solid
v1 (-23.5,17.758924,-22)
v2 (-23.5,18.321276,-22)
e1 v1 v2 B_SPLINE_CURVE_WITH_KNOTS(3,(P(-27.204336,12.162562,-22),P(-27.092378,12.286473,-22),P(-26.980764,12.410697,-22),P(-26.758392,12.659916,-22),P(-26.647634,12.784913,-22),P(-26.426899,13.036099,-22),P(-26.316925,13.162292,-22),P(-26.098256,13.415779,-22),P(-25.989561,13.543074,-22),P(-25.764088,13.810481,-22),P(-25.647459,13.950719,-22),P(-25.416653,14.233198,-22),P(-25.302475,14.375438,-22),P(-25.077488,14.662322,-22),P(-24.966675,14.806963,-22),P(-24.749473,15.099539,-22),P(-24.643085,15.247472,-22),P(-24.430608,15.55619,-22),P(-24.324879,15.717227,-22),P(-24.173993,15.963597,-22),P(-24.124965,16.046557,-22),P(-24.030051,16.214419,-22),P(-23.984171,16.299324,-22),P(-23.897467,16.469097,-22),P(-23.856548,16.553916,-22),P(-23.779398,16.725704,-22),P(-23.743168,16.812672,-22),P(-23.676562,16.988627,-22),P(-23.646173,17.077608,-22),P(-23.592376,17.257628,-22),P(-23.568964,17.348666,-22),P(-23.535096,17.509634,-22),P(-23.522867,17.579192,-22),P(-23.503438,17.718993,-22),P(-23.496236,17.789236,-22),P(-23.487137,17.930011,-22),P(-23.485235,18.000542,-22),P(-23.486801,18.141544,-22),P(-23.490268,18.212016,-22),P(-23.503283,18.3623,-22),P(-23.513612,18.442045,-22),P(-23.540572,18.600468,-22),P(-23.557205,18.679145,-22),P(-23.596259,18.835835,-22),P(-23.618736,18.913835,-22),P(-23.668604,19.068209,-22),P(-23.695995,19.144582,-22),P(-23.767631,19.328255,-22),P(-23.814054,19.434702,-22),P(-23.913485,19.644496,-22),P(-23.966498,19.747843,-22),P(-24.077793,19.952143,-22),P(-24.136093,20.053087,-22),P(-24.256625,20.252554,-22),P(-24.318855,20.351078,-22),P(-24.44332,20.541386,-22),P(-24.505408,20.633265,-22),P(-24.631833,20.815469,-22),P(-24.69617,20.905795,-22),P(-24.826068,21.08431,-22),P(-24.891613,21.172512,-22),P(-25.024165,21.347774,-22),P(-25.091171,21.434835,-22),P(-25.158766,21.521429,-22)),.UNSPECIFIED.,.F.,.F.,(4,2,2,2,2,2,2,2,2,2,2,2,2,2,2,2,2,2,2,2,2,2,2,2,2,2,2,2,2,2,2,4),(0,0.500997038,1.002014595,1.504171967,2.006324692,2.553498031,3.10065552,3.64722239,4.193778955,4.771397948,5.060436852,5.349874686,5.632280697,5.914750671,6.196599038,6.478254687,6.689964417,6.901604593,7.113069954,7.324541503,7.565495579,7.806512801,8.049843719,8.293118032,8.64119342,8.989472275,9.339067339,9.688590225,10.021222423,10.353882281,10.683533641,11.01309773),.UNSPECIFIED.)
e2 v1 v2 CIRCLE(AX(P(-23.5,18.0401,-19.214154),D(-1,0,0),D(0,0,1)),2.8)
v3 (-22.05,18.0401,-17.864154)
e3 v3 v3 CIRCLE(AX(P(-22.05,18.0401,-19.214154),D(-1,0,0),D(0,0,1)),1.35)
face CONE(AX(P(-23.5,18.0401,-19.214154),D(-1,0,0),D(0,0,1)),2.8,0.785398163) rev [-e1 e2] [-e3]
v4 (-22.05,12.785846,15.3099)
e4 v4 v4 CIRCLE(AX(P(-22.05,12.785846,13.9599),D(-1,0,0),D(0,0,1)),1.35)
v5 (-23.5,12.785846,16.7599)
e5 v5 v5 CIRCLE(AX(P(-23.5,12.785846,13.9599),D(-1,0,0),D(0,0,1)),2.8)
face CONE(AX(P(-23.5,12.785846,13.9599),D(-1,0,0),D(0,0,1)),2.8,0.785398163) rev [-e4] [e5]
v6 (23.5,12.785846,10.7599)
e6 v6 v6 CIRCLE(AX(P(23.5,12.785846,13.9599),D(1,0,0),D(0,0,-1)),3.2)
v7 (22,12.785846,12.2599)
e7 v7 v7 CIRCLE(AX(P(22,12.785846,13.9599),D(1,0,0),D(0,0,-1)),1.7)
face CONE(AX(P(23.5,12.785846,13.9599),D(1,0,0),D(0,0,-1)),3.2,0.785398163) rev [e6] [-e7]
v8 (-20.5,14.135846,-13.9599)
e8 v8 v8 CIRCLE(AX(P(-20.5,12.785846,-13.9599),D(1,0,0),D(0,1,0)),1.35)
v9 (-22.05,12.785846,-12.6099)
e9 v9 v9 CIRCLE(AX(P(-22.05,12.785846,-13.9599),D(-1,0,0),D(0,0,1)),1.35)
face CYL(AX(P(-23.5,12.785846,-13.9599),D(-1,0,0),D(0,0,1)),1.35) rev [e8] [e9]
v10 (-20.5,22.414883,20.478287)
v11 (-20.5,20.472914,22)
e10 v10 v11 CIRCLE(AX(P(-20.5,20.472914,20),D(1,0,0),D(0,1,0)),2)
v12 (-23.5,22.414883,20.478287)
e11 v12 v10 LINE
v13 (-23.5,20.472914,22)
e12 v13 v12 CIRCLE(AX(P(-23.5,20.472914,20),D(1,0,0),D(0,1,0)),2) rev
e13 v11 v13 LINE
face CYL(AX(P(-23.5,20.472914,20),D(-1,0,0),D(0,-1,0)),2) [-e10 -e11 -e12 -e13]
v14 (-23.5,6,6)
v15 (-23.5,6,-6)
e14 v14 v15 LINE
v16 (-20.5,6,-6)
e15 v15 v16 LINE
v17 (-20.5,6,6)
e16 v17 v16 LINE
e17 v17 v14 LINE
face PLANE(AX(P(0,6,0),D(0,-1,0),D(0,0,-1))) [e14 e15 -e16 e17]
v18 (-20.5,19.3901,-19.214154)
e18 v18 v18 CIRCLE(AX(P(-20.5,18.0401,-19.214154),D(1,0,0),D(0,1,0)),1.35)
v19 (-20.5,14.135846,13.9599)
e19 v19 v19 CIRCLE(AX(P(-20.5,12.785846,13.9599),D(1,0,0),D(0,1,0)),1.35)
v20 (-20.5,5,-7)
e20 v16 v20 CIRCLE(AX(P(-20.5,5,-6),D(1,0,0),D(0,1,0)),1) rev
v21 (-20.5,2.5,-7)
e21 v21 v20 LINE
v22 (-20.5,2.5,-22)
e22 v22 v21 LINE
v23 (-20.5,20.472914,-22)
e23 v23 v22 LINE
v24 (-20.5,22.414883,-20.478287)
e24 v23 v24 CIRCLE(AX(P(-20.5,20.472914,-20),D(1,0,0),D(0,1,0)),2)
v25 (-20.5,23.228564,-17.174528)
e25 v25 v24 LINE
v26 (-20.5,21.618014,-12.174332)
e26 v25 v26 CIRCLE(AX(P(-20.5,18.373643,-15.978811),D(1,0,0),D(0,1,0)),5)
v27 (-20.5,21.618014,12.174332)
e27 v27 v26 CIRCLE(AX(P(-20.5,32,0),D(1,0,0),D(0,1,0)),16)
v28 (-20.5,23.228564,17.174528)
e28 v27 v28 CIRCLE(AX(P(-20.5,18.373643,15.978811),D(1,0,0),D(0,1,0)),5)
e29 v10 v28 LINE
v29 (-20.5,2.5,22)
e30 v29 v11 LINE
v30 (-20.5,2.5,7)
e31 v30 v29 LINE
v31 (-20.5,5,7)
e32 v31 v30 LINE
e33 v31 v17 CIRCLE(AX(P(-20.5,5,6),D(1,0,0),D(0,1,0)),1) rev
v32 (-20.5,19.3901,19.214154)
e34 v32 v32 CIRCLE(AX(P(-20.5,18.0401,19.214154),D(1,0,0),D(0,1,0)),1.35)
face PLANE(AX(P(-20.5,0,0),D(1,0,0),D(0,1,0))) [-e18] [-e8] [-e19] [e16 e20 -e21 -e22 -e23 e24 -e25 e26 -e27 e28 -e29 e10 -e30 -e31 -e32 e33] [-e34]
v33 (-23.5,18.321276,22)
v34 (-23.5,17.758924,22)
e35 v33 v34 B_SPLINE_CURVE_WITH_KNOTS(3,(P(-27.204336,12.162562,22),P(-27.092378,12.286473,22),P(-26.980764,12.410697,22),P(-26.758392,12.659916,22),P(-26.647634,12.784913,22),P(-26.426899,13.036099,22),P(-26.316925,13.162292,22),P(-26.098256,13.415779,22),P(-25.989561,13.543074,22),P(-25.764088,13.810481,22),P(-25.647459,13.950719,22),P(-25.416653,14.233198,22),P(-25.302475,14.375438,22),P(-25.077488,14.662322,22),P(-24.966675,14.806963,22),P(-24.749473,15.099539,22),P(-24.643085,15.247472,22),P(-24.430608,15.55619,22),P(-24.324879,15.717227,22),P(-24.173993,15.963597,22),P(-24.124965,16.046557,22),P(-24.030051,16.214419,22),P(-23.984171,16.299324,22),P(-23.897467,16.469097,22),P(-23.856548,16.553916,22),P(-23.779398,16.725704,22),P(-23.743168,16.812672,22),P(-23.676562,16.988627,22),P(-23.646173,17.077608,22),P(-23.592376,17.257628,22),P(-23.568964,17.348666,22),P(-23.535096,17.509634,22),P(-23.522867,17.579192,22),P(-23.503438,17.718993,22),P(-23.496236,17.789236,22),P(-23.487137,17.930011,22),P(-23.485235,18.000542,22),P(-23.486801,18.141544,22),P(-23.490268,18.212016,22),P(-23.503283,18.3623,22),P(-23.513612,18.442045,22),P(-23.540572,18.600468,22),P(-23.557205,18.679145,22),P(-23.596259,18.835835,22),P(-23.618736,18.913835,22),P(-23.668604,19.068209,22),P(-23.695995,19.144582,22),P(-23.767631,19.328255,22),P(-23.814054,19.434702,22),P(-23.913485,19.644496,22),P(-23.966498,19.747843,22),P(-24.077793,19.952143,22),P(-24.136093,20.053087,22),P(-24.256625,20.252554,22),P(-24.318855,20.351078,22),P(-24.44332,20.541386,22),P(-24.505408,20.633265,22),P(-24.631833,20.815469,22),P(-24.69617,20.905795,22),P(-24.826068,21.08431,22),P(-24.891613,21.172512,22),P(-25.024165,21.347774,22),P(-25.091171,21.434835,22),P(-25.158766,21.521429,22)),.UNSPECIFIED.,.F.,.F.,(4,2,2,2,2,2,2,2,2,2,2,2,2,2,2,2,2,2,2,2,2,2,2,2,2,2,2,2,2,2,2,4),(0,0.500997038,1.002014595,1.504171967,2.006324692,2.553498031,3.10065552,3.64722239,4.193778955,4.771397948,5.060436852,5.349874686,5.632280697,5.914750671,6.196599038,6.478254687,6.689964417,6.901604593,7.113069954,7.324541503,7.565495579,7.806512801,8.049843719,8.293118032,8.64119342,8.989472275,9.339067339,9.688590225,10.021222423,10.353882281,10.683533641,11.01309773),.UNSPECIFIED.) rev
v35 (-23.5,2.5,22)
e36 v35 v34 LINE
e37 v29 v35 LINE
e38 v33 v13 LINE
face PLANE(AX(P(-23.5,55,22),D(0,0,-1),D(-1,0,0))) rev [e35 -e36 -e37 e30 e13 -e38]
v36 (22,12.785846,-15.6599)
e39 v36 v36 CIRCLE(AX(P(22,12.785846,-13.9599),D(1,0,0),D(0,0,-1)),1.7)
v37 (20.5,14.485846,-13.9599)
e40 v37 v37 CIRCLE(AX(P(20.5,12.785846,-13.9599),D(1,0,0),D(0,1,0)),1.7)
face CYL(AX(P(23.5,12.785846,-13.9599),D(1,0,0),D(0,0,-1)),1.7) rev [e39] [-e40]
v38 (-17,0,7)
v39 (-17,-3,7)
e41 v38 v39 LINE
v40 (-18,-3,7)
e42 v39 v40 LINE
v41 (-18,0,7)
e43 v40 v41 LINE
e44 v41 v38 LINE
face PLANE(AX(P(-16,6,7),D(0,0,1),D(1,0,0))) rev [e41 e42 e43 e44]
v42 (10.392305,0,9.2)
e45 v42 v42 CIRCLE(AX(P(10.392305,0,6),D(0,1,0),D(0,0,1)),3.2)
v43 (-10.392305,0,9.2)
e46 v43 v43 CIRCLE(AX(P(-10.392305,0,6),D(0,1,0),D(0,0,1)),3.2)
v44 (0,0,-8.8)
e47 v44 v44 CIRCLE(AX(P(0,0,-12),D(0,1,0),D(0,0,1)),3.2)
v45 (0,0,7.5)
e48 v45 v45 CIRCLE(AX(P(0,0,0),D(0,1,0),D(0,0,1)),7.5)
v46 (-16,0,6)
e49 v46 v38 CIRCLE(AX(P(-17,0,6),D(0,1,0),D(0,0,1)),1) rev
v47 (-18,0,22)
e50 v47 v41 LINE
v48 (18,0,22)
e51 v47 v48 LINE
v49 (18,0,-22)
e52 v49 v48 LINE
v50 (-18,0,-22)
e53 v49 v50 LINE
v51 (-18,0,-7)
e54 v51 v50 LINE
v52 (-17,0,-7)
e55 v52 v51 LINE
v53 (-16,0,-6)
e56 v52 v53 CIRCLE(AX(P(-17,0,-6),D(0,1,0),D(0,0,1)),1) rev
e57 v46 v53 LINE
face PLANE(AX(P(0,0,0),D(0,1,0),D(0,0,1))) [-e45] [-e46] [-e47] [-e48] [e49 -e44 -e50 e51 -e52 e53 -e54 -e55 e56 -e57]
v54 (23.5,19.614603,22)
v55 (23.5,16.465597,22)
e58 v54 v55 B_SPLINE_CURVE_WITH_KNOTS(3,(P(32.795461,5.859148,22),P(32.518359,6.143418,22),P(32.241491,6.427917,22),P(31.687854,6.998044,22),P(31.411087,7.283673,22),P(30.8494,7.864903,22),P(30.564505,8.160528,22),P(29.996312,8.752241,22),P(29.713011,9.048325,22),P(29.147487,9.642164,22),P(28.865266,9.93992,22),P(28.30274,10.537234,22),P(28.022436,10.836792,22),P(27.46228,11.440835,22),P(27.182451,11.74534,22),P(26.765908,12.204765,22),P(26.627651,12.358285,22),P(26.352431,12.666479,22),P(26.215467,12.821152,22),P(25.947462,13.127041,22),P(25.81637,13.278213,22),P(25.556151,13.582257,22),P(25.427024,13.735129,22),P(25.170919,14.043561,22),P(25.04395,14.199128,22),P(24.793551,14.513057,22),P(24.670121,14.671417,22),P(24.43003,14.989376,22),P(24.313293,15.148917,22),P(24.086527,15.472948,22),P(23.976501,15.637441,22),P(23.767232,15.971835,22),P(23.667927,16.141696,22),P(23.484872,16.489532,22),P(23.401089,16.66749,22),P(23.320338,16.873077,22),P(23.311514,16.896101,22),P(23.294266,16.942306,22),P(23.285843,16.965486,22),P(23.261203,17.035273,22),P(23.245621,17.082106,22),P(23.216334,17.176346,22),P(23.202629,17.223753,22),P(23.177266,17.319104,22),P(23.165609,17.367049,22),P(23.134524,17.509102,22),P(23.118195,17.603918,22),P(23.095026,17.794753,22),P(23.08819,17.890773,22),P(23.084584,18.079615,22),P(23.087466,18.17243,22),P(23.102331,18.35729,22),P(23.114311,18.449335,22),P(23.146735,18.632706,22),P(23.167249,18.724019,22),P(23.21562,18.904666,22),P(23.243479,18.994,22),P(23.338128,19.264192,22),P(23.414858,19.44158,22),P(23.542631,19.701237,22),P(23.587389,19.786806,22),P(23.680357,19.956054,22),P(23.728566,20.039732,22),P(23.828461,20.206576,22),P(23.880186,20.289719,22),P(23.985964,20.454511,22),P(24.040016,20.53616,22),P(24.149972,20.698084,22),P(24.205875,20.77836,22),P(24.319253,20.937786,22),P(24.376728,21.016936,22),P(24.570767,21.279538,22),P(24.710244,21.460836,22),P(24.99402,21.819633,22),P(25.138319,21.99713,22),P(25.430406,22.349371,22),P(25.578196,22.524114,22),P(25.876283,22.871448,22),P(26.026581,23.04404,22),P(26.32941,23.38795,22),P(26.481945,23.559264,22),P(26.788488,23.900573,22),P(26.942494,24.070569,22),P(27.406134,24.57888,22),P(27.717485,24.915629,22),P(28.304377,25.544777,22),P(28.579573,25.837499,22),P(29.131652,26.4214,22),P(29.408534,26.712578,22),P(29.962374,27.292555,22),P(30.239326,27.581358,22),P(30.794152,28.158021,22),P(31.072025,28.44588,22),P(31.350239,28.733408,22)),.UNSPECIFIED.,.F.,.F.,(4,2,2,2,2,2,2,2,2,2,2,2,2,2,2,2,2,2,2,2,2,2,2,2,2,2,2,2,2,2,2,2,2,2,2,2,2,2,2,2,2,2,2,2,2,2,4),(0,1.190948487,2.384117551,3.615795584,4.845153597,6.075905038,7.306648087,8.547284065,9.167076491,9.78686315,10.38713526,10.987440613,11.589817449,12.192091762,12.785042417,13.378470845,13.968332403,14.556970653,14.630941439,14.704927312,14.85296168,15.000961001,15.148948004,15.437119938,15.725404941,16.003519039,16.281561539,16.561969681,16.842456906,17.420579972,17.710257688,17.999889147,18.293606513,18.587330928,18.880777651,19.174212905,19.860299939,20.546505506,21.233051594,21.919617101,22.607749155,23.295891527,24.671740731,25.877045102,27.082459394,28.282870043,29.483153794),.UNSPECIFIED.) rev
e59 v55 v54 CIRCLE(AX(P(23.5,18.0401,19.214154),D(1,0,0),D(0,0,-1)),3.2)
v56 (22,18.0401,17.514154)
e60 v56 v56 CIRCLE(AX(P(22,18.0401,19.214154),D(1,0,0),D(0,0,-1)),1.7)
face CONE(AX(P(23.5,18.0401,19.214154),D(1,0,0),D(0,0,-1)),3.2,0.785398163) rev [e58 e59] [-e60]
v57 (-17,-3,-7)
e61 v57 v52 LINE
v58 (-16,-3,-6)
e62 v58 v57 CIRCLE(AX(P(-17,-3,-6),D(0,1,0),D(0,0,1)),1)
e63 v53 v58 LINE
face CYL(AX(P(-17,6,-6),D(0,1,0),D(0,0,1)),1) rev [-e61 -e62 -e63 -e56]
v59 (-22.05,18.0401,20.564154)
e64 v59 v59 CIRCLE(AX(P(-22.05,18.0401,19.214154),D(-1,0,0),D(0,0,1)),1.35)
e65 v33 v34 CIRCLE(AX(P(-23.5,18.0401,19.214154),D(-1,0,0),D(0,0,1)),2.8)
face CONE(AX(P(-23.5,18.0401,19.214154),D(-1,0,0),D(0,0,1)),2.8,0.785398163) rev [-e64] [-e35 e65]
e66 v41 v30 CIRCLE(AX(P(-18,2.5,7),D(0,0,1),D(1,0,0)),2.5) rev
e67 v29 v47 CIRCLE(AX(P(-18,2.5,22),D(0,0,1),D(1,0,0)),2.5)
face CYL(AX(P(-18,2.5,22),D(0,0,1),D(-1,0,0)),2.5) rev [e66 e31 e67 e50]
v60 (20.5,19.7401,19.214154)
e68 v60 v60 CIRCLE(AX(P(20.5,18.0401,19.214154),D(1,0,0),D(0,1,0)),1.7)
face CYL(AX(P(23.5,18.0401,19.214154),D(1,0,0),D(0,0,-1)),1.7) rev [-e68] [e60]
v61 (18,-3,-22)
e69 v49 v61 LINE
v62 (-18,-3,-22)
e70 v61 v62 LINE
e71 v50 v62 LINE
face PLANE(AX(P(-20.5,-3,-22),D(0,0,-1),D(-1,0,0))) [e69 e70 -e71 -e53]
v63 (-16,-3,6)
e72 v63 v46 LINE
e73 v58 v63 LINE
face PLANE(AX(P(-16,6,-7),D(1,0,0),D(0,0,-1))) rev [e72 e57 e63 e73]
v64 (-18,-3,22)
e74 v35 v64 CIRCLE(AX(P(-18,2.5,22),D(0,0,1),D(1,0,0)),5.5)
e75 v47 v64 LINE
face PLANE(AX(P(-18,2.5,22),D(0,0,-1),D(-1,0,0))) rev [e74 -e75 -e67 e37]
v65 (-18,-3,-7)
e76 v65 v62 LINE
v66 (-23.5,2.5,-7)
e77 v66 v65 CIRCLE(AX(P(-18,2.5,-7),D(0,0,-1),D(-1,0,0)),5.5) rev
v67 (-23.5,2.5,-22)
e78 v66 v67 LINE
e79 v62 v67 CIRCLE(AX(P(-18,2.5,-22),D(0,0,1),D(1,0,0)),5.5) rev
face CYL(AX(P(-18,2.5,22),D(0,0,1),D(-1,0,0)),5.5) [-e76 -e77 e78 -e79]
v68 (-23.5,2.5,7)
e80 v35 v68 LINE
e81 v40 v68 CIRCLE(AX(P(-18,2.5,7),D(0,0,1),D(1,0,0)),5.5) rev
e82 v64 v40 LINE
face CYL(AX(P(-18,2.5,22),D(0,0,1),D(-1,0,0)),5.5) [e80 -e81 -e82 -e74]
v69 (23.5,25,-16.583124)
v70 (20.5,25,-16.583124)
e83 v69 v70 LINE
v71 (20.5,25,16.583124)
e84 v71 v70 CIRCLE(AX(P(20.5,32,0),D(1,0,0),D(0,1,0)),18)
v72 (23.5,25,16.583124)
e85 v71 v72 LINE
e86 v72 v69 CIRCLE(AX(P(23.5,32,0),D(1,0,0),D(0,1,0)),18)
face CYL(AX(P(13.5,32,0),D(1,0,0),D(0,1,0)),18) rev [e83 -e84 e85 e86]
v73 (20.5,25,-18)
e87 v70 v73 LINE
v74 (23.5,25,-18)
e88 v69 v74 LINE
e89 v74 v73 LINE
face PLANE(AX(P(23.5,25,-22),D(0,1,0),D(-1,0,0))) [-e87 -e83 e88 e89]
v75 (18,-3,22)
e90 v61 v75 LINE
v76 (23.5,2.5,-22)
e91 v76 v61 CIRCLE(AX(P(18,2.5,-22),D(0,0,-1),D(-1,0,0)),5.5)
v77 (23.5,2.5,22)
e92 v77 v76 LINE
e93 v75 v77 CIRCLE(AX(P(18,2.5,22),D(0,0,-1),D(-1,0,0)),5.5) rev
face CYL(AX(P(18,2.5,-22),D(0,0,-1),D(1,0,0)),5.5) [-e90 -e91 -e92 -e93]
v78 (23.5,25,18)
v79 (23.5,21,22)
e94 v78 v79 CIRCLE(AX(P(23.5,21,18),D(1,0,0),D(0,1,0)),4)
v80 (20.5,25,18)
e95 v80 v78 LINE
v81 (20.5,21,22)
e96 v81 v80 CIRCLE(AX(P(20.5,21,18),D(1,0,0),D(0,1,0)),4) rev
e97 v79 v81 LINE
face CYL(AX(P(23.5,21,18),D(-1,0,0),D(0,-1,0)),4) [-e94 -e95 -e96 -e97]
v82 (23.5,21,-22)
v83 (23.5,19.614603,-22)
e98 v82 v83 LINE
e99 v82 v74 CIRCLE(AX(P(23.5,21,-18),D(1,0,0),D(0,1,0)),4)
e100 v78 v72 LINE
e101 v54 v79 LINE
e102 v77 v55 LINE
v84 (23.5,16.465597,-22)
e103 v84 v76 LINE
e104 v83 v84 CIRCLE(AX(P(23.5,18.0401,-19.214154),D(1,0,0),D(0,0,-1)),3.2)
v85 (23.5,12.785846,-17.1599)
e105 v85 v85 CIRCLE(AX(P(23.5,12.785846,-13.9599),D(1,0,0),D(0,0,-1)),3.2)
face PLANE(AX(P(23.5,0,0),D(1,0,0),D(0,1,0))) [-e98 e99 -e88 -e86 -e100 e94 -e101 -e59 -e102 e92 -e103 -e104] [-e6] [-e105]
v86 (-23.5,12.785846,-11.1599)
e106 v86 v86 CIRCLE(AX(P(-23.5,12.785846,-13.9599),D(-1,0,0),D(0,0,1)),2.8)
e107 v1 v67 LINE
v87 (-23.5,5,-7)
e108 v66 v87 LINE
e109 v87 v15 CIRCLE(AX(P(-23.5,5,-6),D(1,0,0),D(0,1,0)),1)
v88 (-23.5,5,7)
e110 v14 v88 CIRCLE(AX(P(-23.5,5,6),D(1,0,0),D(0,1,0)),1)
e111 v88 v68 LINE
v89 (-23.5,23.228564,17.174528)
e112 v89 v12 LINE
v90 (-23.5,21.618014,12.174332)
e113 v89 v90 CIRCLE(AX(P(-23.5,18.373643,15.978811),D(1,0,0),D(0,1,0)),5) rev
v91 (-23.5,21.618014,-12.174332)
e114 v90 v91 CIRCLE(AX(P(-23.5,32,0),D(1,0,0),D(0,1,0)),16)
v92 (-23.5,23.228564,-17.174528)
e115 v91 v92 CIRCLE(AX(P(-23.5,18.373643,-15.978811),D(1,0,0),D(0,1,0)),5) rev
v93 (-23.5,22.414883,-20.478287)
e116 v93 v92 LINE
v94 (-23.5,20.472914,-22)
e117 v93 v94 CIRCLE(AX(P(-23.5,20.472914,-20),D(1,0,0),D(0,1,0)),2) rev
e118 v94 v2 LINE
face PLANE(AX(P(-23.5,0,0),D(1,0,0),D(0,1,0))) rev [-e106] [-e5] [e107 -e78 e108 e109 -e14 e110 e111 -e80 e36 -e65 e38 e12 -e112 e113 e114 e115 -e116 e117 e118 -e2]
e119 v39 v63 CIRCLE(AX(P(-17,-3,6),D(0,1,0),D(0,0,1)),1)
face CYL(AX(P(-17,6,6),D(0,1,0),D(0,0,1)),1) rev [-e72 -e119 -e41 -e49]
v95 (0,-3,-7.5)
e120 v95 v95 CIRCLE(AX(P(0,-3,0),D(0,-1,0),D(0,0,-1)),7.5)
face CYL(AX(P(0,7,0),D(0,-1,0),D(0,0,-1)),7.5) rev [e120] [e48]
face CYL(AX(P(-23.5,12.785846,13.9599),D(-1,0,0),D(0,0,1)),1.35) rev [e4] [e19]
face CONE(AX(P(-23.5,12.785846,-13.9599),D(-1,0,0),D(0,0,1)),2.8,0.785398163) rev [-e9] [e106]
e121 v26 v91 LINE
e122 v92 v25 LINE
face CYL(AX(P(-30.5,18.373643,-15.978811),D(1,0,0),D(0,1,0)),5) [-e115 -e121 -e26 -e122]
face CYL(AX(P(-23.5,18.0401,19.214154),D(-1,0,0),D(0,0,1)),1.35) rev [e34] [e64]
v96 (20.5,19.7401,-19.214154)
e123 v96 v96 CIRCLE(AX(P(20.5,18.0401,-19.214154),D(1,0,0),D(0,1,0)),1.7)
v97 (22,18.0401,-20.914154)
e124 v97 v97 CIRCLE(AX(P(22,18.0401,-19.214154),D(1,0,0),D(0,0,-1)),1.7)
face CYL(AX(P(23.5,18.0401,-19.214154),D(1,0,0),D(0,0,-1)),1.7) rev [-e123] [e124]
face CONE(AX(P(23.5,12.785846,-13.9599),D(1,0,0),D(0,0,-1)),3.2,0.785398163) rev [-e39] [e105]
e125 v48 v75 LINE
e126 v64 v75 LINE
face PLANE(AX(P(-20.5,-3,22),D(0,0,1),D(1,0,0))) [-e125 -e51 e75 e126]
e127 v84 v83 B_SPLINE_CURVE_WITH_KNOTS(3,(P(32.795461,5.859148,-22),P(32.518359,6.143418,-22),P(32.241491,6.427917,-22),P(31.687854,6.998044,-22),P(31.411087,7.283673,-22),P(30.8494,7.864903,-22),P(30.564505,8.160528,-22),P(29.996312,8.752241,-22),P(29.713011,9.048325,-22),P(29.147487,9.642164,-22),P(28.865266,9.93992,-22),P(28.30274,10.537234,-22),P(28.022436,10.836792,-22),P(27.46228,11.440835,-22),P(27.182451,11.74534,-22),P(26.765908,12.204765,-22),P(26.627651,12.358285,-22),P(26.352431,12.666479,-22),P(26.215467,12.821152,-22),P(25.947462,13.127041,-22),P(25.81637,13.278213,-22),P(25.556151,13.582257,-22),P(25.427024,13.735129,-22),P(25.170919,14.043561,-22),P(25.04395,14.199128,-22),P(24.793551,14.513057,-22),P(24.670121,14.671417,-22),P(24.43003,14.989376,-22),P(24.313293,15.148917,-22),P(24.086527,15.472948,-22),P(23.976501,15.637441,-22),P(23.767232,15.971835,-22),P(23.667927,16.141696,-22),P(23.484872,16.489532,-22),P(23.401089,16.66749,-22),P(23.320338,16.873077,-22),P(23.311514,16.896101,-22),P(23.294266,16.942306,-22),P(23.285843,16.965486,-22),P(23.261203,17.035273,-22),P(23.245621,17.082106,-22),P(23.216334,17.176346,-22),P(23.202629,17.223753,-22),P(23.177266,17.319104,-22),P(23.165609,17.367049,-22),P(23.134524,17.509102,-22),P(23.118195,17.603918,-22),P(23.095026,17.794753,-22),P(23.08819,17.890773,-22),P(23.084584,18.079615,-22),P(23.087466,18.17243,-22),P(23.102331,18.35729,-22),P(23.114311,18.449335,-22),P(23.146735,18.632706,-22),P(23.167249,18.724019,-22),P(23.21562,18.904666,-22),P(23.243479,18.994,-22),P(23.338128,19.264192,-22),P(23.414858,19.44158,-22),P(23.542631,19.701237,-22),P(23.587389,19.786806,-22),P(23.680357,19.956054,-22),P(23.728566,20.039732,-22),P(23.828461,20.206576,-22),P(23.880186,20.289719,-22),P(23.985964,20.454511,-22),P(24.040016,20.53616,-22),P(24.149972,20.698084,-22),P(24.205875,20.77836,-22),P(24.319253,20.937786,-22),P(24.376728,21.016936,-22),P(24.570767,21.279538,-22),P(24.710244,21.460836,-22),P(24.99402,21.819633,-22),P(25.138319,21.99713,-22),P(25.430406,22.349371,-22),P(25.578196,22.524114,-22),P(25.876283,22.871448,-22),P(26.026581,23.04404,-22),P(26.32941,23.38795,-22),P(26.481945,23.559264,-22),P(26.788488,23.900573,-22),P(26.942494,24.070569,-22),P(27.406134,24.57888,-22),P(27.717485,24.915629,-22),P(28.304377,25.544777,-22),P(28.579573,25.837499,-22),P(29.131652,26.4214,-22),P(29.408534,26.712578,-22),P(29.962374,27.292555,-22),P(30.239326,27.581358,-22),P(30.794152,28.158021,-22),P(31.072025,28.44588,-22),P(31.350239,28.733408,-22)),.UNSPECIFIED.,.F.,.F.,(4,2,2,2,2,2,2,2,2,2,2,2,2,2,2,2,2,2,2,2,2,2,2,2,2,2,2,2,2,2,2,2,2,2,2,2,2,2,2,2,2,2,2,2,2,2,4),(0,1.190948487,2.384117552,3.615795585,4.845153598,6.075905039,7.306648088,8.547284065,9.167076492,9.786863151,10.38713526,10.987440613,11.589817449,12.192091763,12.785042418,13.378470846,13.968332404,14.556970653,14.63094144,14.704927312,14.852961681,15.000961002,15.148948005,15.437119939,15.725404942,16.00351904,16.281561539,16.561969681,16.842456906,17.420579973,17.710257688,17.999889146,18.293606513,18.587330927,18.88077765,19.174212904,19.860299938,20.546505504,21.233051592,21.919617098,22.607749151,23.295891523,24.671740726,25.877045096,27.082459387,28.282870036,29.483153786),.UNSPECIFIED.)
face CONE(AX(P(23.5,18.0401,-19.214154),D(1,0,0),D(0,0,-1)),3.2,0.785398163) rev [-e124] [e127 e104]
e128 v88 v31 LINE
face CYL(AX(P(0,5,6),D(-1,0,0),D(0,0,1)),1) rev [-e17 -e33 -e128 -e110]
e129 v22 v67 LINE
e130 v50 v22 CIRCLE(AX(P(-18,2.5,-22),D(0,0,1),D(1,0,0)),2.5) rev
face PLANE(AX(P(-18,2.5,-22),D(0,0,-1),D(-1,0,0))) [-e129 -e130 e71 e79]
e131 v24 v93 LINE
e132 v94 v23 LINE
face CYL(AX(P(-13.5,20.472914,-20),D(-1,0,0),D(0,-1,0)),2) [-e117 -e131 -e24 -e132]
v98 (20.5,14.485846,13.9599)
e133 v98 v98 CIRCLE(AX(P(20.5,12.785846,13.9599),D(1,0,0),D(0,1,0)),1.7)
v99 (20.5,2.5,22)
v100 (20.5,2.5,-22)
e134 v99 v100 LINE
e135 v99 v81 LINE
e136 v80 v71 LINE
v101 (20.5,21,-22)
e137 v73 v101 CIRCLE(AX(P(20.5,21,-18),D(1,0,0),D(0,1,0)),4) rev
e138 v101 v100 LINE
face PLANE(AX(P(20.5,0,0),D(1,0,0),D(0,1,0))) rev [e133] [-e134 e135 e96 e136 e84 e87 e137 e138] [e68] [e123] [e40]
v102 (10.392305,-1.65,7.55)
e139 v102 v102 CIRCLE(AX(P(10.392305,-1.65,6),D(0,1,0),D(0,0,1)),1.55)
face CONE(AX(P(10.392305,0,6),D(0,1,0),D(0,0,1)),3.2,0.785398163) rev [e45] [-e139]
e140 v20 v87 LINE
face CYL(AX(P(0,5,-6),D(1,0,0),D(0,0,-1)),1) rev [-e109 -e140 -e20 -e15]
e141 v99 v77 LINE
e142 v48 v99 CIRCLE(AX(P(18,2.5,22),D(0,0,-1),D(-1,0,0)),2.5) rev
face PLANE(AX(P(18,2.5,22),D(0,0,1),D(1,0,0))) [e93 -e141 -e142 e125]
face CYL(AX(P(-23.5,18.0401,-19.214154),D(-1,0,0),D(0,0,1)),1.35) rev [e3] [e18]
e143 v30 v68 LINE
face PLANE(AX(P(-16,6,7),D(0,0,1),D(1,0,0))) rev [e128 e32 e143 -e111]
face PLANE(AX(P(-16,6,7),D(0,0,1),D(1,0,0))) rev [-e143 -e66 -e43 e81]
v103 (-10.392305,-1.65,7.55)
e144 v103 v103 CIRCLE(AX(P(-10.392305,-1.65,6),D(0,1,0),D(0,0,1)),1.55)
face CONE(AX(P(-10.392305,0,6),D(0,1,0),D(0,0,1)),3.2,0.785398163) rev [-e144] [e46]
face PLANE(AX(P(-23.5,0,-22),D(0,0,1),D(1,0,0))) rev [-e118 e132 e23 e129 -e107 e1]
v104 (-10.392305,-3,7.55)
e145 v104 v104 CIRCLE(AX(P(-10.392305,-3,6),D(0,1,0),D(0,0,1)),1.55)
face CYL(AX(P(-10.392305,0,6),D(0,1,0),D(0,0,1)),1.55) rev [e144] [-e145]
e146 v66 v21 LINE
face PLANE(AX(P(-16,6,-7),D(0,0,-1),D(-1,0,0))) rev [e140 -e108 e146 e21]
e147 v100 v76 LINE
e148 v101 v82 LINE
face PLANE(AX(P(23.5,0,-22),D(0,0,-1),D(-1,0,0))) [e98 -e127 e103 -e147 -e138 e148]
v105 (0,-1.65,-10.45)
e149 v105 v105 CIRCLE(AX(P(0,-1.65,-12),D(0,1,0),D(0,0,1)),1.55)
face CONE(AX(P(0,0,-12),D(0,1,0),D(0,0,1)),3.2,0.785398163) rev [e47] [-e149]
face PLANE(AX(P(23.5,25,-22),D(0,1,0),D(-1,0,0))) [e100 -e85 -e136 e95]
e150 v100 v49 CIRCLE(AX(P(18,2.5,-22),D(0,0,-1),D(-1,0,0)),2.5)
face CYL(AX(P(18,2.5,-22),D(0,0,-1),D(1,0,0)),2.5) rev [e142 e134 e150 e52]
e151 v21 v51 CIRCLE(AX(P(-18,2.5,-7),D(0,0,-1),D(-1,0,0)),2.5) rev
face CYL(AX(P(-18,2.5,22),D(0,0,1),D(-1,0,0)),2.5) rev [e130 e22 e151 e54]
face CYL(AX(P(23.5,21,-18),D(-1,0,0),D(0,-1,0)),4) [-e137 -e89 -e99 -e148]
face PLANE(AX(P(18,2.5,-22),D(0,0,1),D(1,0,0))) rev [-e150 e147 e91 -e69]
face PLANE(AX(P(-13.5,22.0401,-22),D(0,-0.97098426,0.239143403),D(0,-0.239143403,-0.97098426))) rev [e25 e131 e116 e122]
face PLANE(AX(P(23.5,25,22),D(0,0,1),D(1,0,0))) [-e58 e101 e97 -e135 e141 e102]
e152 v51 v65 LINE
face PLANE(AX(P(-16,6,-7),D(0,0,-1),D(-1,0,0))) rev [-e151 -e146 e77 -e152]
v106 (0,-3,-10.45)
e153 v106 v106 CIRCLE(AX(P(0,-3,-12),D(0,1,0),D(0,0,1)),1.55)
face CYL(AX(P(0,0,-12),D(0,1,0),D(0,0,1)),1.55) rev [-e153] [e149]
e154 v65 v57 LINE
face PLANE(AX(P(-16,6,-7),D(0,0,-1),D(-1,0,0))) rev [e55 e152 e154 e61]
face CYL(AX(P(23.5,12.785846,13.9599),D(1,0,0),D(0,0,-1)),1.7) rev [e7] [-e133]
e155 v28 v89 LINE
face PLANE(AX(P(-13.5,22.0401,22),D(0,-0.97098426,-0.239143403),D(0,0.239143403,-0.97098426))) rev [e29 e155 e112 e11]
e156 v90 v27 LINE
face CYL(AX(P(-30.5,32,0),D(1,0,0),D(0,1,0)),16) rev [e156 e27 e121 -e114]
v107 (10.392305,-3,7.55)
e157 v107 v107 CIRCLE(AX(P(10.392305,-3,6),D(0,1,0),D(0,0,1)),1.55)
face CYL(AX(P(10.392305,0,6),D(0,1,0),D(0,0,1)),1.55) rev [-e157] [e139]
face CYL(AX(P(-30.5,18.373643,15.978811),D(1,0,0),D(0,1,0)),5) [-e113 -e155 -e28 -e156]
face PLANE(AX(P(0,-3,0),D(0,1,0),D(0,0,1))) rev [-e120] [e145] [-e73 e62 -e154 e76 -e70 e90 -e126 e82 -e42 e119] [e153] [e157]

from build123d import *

# Parameters (mm, degrees)
SKETCH_1_W                       = 41
SKETCH_1_H                       = 44
SM_BASE_FLANGE_1_DEPTH           = 3
SM_EDGE_FLANGE_1_STRIP_W         = 17
SM_EDGE_FLANGE_1_STRIP_H         = 3
SM_EDGE_FLANGE_1_STRIP_CUT_DEPTH = 44
SM_EDGE_FLANGE_1_DEPTH           = 44
SKETCH_11_R                      = 16
CUT_EXTRUDE_1_DEPTH              = 10
HOLE_WIZARD_M3_1_D               = 3.1
HOLE_WIZARD_M3_1_DEPTH           = 5.2
HOLE_WIZARD_M3_1_CSINK_D         = 6.4
HOLE_WIZARD_M3_1_CSINK_ANGLE     = 90
HOLE_WIZARD_M3_1_TIP             = 0.931333959
CUT_EXTRUDE_START                = -10
CUT_EXTRUDE_2_DEPTH              = 10
HOLE_WIZARD_M2_5_1_D             = 2.7
HOLE_WIZARD_M2_5_1_DEPTH         = 5.2
HOLE_WIZARD_M2_5_1_CSINK_D       = 5.6
HOLE_WIZARD_M2_5_1_CSINK_ANGLE   = 90
HOLE_WIZARD_M2_5_1_TIP           = 0.811161836
SM_EDGE_FLANGE_2_STRIP_W         = 17
SM_EDGE_FLANGE_2_STRIP_H         = 3
SM_EDGE_FLANGE_2_STRIP_CUT_DEPTH = 44
SM_EDGE_FLANGE_2_DEPTH           = 44
FILLET_1_R                       = 4
FILLET_2_R                       = 1
HOLE_WIZARD_M3_2_AT_2_COUNT      = 2
HOLE_WIZARD_M3_2_AT_2_PITCH      = 7.430637089
HOLE_WIZARD_M3_2_AT_3_COUNT      = 2
HOLE_WIZARD_M3_2_AT_3_PITCH      = 27.919799484
HOLE_WIZARD_M3_2_AT_4_COUNT      = 2
HOLE_WIZARD_M3_2_AT_4_PITCH      = 33.587572106
SKETCH_28_R                      = 18
CUT_EXTRUDE_3_DEPTH              = 10
SKETCH_29_R                      = 7.5
CUT_EXTRUDE_4_DEPTH              = 10
SKETCH_30_W                      = 10
SKETCH_30_H                      = 14
CUT_EXTRUDE_5_DEPTH              = 9
CUT_EXTRUDE_6_DEPTH              = 10
FILLET_3_R                       = 2
FILLET_4_R                       = 5
FILLET_5_R                       = 1


# Sheet-metal steps are written as plain solids
with BuildPart() as part:
    # Sketch 1 → 基体-法兰1 (new body)
    with BuildSketch(Plane(origin=(0, 0, 0), x_dir=(1, 0, 0), z_dir=(0, 1, 0))):
        Rectangle(SKETCH_1_W, SKETCH_1_H)
    extrude(amount=-SM_BASE_FLANGE_1_DEPTH)

    # 边线-法兰1 strip (across the edge) → 边线-法兰1 strip cut (cut)
    with BuildSketch(Plane(origin=(-20.5, 0, -22), x_dir=(1, 0, 0), z_dir=(0, 0, 1))):
        with Locations((-6, -1.5)):
            Rectangle(SM_EDGE_FLANGE_1_STRIP_W, SM_EDGE_FLANGE_1_STRIP_H)
    extrude(amount=SM_EDGE_FLANGE_1_STRIP_CUT_DEPTH, mode=Mode.SUBTRACT)

    # 边线-法兰1 section (across the edge) → 边线-法兰1 (add)
    with BuildSketch(Plane(origin=(-20.5, 0, -22), x_dir=(1, 0, 0), z_dir=(0, 0, 1))):
        with BuildLine():
            Line((-3, 2.5), (-3, 55))
            Line((-3, 55), (0, 55))
            Line((0, 55), (0, 2.5))
            ThreePointArc((0, 2.5), (0.732233047, 0.732233047), (2.5, 0))
            Line((2.5, 0), (2.5, -3))
            ThreePointArc((2.5, -3), (-1.389087297, -1.389087297), (-3, 2.5))
        make_face()
    extrude(amount=SM_EDGE_FLANGE_1_DEPTH)

    # 草图11 → 切除-拉伸1 (cut)
    with BuildSketch(Plane(origin=(-20.5, 0, 0), x_dir=(0, 0, -1), z_dir=(1, 0, 0))):
        with Locations(Location((0, 32, 0), (0, 0, 90))):
            Circle(SKETCH_11_R)
    extrude(amount=-CUT_EXTRUDE_1_DEPTH, mode=Mode.SUBTRACT)

    # M3 开槽半沉头螺钉的锥形沉头孔1
    with Locations(Plane(origin=(0, 0, 0), x_dir=(1, 0, 0), z_dir=(0, 1, 0))):
        with Locations((0, 12), (10.392304845, -6), (-10.392304845, -6)):
            CounterSinkHole(HOLE_WIZARD_M3_1_D / 2, HOLE_WIZARD_M3_1_CSINK_D / 2, depth=HOLE_WIZARD_M3_1_DEPTH, counter_sink_angle=HOLE_WIZARD_M3_1_CSINK_ANGLE)
            with Locations((0, 0, -(HOLE_WIZARD_M3_1_DEPTH + HOLE_WIZARD_M3_1_TIP / 2))):  # 118° drill point
                Cone(0, HOLE_WIZARD_M3_1_D / 2, HOLE_WIZARD_M3_1_TIP, mode=Mode.SUBTRACT)

    # 草图17 → 切除-拉伸2 (cut)
    with BuildSketch(Plane.ZY.offset(23.5).offset(CUT_EXTRUDE_START)):
        with BuildLine():
            Line((-16, 32), (-16, 55))
            ThreePointArc((-16, 55), (0, 71), (16, 55))
            Line((16, 55), (16, 32))
            ThreePointArc((16, 32), (0, 16), (-16, 32))
        make_face()
    extrude(amount=CUT_EXTRUDE_2_DEPTH, mode=Mode.SUBTRACT)

    # M2.5 开槽半沉头螺钉的锥形沉头孔1
    with Locations(Plane.ZY.offset(23.5)):
        with Locations((19.214153616, 18.040100258), (19.214153616, 45.959899742), (-19.214153616, 45.959899742), (-19.214153616, 18.040100258), (-13.959899742, 12.785846384), (13.959899742, 12.785846384)):
            CounterSinkHole(HOLE_WIZARD_M2_5_1_D / 2, HOLE_WIZARD_M2_5_1_CSINK_D / 2, depth=HOLE_WIZARD_M2_5_1_DEPTH, counter_sink_angle=HOLE_WIZARD_M2_5_1_CSINK_ANGLE)
            with Locations((0, 0, -(HOLE_WIZARD_M2_5_1_DEPTH + HOLE_WIZARD_M2_5_1_TIP / 2))):  # 118° drill point
                Cone(0, HOLE_WIZARD_M2_5_1_D / 2, HOLE_WIZARD_M2_5_1_TIP, mode=Mode.SUBTRACT)

    # 边线-法兰2 strip (across the edge) → 边线-法兰2 strip cut (cut)
    with BuildSketch(Plane(origin=(20.5, 0, 22), x_dir=(-1, 0, 0), z_dir=(0, 0, -1))):
        with Locations((-6, -1.5)):
            Rectangle(SM_EDGE_FLANGE_2_STRIP_W, SM_EDGE_FLANGE_2_STRIP_H)
    extrude(amount=SM_EDGE_FLANGE_2_STRIP_CUT_DEPTH, mode=Mode.SUBTRACT)

    # 边线-法兰2 section (across the edge) → 边线-法兰2 (add)
    with BuildSketch(Plane(origin=(20.5, 0, 22), x_dir=(-1, 0, 0), z_dir=(0, 0, -1))):
        with BuildLine():
            Line((-3, 2.5), (-3, 25))
            Line((-3, 25), (0, 25))
            Line((0, 25), (0, 2.5))
            ThreePointArc((0, 2.5), (0.732233047, 0.732233047), (2.5, 0))
            Line((2.5, 0), (2.5, -3))
            ThreePointArc((2.5, -3), (-1.389087297, -1.389087297), (-3, 2.5))
        make_face()
    extrude(amount=SM_EDGE_FLANGE_2_DEPTH)

    # 圆角1
    fillet_1_edges = [part.edges().sort_by_distance(p)[0] for p in [
        (22, 25, 22),
        (22, 25, -22),
        (-22, 55, -22),
        (-22, 55, 22),
    ]]
    fillet(fillet_1_edges, radius=FILLET_1_R)

    # 圆角2
    fillet_2_edges = [part.edges().sort_by_distance(p)[0] for p in [
        (-22, 55, -16),
        (-22, 55, 16),
    ]]
    fillet(fillet_2_edges, radius=FILLET_2_R)

    # 草图27 → M3 开槽半沉头螺钉的锥形沉头孔2 (revolve, cut)
    with BuildSketch(Plane(origin=(23.5, 12.785846384, 13.959899742), x_dir=(0, 0, -1), z_dir=(0, 1, 0))):
        Polygon((0, 0), (0, 3), (1.7, 3), (1.7, 1.5), (3.2, 0), align=None)
    hole_wizard_m3_2 = revolve(axis=Axis((29.85, 12.785846384, 13.959899742), (-1, 0, 0)), mode=Mode.SUBTRACT)

    # M3 开槽半沉头螺钉的锥形沉头孔2 at 2: M3 开槽半沉头螺钉的锥形沉头孔2 ×2
    with Locations(*[Vector(2.6296433264448836e-15, 0.7071067811865475, 0.7071067811865477) * (i * HOLE_WIZARD_M3_2_AT_2_PITCH) for i in range(1, HOLE_WIZARD_M3_2_AT_2_COUNT)]):
        add(hole_wizard_m3_2, mode=Mode.SUBTRACT)

    # M3 开槽半沉头螺钉的锥形沉头孔2 at 3: M3 开槽半沉头螺钉的锥形沉头孔2 ×2
    with Locations(*[(0, 0, -i * HOLE_WIZARD_M3_2_AT_3_PITCH) for i in range(1, HOLE_WIZARD_M3_2_AT_3_COUNT)]):
        add(hole_wizard_m3_2, mode=Mode.SUBTRACT)

    # M3 开槽半沉头螺钉的锥形沉头孔2 at 4: M3 开槽半沉头螺钉的锥形沉头孔2 ×2
    with Locations(*[Vector(0, 0.15643446504022762, -0.9876883405951383) * (i * HOLE_WIZARD_M3_2_AT_4_PITCH) for i in range(1, HOLE_WIZARD_M3_2_AT_4_COUNT)]):
        add(hole_wizard_m3_2, mode=Mode.SUBTRACT)

    # 草图28 → 切除-拉伸3 (cut)
    with BuildSketch(Plane(origin=(23.5, 0, 0), x_dir=(0, 0, -1), z_dir=(1, 0, 0))):
        with Locations((0, 32)):
            Circle(SKETCH_28_R)
    extrude(amount=-CUT_EXTRUDE_3_DEPTH, mode=Mode.SUBTRACT)

    # 草图29 → 切除-拉伸4 (cut)
    with BuildSketch(Plane.XZ.offset(3)):
        with Locations(Location((0, 0, 0), (0, 0, 270))):
            Circle(SKETCH_29_R)
    extrude(amount=-CUT_EXTRUDE_4_DEPTH, mode=Mode.SUBTRACT)

    # 草图30 → 切除-拉伸5 (cut)
    with BuildSketch(Plane.XZ.offset(3)):
        with Locations((-21, 0)):
            Rectangle(SKETCH_30_W, SKETCH_30_H)
    extrude(amount=-CUT_EXTRUDE_5_DEPTH, mode=Mode.SUBTRACT)

    # 草图32 → 切除-拉伸6 (cut)
    with BuildSketch(Plane.ZY.offset(23.5)):
        Polygon((-22, 22.040100258), (-13.879481118, 24.040100258), (-13.879481118, 65.768696361), (-22, 65.768696361), align=None)
        Polygon((13.879481118, 65.768696361), (13.879481118, 24.040100258), (22, 22.040100258), (22, 65.768696361), align=None)
    extrude(amount=-CUT_EXTRUDE_6_DEPTH, mode=Mode.SUBTRACT)

    # 圆角3
    fillet_3_edges = [part.edges().sort_by_distance(p)[0] for p in [
        (-22, 22.040100258, -22),
        (-22, 22.040100258, 22),
    ]]
    fillet(fillet_3_edges, radius=FILLET_3_R)

    # 圆角4
    fillet_4_edges = [part.edges().sort_by_distance(p)[0] for p in [
        (-22, 24.040100258, 13.879481118),
        (-22, 24.040100258, -13.879481118),
    ]]
    fillet(fillet_4_edges, radius=FILLET_4_R)

    # 圆角5
    fillet_5_edges = [part.edges().sort_by_distance(p)[0] for p in [
        (-22, 6, -7),
        (-16, -1.5, -7),
        (-22, 6, 7),
        (-16, -1.5, 7),
    ]]
    fillet(fillet_5_edges, radius=FILLET_5_R)


solid = part.part
